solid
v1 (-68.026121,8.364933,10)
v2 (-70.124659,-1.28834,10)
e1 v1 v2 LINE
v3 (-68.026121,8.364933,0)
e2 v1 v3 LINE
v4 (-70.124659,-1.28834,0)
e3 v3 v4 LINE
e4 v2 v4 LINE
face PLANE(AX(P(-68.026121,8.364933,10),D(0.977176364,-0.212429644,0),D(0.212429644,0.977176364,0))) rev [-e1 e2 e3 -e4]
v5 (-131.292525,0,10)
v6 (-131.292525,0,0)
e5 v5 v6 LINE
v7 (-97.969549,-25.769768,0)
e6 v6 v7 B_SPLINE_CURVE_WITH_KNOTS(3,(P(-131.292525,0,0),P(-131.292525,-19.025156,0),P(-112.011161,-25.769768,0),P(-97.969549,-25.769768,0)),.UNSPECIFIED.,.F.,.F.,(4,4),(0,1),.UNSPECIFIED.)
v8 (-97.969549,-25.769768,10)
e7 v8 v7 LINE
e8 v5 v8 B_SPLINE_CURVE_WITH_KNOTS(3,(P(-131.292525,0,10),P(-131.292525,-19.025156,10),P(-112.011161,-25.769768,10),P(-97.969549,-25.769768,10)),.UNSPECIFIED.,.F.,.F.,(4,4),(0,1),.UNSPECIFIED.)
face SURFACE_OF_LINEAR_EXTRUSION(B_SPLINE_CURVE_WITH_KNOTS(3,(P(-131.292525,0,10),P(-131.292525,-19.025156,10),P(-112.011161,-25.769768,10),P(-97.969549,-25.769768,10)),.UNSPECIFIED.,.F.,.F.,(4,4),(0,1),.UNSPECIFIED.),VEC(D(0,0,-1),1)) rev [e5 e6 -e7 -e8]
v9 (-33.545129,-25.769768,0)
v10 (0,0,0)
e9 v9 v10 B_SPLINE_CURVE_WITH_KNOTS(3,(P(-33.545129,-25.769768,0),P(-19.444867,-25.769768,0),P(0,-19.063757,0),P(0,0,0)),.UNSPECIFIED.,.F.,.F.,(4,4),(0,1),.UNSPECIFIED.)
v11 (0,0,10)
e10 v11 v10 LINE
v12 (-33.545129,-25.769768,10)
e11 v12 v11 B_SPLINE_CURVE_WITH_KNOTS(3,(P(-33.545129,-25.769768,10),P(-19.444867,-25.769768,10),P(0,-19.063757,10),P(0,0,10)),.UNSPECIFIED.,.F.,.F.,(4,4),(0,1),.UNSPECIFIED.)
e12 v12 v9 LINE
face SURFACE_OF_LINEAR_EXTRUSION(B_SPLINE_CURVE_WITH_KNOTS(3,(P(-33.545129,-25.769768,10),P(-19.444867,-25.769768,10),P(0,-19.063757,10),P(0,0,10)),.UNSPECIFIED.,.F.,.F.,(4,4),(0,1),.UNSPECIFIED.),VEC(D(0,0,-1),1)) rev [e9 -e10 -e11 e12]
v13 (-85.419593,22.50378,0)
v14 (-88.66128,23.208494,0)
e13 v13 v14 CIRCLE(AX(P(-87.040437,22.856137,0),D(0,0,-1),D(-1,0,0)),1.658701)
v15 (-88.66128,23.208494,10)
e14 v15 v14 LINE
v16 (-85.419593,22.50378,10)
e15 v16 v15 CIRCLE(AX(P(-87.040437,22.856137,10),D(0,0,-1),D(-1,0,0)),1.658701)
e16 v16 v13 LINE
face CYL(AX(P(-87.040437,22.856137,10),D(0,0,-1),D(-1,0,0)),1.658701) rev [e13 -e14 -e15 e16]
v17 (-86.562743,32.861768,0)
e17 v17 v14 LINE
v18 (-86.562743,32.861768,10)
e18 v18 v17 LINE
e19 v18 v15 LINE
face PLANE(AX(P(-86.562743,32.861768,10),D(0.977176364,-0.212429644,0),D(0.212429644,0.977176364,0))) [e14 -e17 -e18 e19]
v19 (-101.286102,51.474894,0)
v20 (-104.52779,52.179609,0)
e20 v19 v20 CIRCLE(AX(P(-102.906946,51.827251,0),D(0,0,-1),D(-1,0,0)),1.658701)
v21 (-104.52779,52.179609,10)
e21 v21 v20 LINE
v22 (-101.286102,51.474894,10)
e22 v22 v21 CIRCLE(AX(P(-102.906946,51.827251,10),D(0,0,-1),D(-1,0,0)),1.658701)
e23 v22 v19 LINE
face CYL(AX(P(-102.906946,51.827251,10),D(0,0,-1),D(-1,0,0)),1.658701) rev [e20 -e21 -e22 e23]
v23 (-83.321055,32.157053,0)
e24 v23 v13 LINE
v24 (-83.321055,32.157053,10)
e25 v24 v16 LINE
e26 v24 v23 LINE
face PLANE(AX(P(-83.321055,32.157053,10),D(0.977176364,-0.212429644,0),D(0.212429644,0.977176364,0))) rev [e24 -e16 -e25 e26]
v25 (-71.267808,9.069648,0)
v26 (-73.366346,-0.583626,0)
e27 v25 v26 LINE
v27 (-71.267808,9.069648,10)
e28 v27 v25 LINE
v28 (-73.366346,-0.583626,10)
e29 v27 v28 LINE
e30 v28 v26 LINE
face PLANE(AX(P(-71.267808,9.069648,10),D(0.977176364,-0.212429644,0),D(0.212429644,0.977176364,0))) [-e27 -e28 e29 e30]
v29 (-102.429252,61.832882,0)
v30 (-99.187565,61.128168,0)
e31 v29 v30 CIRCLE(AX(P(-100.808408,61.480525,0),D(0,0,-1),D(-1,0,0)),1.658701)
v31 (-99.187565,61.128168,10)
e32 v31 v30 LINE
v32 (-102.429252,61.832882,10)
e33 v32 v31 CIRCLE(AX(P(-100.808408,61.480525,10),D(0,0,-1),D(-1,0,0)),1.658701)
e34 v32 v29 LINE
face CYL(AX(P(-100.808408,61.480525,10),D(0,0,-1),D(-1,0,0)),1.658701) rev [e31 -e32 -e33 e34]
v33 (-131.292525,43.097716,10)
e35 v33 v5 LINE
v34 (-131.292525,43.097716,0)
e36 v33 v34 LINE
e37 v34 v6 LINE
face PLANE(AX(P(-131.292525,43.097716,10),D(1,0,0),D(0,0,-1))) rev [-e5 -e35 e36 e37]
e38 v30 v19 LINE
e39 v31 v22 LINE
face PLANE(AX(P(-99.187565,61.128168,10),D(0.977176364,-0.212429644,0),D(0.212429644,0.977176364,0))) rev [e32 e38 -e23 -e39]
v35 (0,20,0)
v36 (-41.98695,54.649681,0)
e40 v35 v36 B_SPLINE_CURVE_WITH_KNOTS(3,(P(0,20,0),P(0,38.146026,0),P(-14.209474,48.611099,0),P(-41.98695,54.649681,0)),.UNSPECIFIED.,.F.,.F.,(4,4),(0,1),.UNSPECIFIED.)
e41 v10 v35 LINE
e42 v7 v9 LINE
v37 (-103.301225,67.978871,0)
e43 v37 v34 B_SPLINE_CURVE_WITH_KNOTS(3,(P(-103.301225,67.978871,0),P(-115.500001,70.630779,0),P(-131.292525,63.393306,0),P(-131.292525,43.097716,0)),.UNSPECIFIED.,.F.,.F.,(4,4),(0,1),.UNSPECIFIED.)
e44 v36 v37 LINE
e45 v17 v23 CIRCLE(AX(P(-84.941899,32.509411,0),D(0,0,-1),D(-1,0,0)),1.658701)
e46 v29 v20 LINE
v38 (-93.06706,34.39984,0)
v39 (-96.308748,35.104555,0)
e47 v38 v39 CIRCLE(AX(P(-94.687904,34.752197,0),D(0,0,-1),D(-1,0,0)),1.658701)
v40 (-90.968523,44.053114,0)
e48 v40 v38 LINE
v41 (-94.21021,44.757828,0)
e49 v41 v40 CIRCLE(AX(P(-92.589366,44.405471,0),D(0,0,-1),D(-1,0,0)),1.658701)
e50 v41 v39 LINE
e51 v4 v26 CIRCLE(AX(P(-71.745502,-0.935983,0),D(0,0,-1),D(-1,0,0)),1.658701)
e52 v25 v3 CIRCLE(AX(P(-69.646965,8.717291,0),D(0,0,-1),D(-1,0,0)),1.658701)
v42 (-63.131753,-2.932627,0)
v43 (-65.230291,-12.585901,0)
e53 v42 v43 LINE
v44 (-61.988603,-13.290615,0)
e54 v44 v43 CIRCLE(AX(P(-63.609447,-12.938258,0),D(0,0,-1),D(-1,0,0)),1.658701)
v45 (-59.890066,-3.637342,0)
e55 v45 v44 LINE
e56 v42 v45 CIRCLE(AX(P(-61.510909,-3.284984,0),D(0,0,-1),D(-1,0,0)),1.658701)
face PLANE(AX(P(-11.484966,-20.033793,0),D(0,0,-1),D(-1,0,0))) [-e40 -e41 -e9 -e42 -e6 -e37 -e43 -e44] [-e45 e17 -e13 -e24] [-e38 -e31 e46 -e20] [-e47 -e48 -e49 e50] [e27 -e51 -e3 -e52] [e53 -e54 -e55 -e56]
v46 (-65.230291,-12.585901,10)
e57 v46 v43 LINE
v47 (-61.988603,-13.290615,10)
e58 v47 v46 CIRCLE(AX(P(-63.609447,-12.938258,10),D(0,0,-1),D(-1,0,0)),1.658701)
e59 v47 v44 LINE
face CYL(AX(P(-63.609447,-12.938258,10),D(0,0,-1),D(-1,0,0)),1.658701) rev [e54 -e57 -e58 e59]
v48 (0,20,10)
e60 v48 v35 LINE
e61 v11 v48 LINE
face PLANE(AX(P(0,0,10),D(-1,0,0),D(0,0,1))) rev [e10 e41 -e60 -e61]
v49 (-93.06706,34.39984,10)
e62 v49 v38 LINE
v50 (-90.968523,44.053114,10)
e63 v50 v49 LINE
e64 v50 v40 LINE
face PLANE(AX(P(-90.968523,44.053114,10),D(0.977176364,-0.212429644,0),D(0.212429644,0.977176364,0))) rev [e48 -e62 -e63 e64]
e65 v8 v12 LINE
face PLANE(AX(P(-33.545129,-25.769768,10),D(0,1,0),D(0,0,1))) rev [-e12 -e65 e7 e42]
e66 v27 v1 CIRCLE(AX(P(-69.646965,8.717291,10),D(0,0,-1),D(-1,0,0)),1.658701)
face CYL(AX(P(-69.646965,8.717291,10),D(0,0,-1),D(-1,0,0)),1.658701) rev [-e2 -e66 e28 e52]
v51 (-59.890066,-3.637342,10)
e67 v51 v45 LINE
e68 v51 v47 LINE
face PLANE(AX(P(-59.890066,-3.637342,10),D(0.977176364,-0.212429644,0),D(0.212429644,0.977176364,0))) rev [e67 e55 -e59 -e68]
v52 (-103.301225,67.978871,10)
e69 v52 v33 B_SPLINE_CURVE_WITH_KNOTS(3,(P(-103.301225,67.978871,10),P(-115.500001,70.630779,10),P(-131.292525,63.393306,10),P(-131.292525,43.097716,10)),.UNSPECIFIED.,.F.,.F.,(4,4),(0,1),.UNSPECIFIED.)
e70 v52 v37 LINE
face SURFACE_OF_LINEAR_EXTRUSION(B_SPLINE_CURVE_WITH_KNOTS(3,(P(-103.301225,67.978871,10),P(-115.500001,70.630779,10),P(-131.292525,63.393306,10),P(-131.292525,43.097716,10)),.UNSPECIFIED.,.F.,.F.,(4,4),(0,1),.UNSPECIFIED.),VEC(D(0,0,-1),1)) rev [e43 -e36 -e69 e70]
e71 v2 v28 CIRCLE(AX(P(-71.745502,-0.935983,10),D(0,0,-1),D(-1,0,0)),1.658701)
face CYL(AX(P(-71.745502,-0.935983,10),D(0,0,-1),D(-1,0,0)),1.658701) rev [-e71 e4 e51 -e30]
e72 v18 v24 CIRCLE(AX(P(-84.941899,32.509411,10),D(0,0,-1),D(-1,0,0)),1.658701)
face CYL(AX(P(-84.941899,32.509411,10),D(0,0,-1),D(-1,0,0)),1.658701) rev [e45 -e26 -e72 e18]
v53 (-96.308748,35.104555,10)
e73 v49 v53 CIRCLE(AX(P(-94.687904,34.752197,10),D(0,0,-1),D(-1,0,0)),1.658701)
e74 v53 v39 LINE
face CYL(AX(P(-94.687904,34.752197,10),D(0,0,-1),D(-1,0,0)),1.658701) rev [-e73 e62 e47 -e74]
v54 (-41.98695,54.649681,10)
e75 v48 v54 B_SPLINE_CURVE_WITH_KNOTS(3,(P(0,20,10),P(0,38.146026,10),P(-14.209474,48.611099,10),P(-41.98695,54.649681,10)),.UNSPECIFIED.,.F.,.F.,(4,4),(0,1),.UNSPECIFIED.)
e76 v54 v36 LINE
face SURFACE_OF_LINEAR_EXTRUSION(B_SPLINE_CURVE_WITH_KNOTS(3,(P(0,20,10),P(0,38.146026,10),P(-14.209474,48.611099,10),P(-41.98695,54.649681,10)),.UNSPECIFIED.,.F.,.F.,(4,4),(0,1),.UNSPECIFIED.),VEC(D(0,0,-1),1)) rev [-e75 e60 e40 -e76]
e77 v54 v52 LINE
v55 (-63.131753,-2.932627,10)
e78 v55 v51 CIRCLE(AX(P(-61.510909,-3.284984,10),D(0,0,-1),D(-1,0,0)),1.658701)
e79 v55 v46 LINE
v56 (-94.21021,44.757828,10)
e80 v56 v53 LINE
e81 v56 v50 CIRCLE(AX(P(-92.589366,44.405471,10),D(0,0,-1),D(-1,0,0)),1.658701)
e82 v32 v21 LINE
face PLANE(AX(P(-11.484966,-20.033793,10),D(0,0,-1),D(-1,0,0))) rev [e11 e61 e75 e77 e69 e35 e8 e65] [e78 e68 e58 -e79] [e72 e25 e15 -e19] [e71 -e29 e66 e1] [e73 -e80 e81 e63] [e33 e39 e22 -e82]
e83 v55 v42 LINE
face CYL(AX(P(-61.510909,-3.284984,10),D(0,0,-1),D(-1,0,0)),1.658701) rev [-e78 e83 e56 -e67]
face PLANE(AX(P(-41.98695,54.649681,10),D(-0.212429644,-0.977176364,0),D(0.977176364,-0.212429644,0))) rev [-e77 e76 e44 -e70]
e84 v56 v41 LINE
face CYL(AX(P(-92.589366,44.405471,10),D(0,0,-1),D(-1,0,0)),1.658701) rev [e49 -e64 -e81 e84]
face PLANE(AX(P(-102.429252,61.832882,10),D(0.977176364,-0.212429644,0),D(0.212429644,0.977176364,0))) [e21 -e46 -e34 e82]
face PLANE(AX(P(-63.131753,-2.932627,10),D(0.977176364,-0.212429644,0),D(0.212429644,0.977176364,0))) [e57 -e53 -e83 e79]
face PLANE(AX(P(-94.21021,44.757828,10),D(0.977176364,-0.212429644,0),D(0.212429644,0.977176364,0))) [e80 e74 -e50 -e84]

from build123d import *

# Parameters (mm, degrees)
EXTRUDE_1_DEPTH     = 10
CUT_EXTRUDE_1_DEPTH = 149.427210809
OTHER_1_DEPTH       = 10


# Read off the part's stored shape, not the designer's step: Массив, управляемый таблицей1
with BuildPart() as part:
    # Эскиз1_fr → Бобышка-Вытянуть1 (new body)
    with BuildSketch(Plane.XY):
        with BuildLine():
            Line((0, 0), (0, 20))
            add(Edge.make_bspline(
                [(0, 20), (0, 38.146025899), (-14.209474182, 48.611098897), (-41.986949672, 54.649680525)],
                knots=[0, 0, 0, 0, 1, 1, 1, 1], degree=3))
            Line((-41.986949672, 54.649680525), (-103.301225383, 67.978870897))
            add(Edge.make_bspline(
                [(-103.301225383, 67.978870897), (-115.500001367, 70.63077872), (-131.292525164, 63.393306184), (-131.292525164, 43.097715536)],
                knots=[0, 0, 0, 0, 1, 1, 1, 1], degree=3))
            Line((-131.292525164, 43.097715536), (-131.292525164, 0))
            add(Edge.make_bspline(
                [(-97.969549234, -25.769768053), (-112.011160689, -25.769768053), (-131.292525164, -19.025155818), (-131.292525164, 0)],
                knots=[0, 0, 0, 0, 1, 1, 1, 1], degree=3))
            Line((-97.969549234, -25.769768053), (-33.545129103, -25.769768053))
            add(Edge.make_bspline(
                [(-33.545129103, -25.769768053), (-19.444866568, -25.769768053), (0, -19.063757455), (0, 0)],
                knots=[0, 0, 0, 0, 1, 1, 1, 1], degree=3))
        make_face()
    extrude(amount=EXTRUDE_1_DEPTH)

    # Эскиз2_fr → Вырез-Вытянуть1 (cut, through all)
    with BuildSketch(Plane(origin=(0, 0, 0), x_dir=(-1, 0, 0), z_dir=(0, 0, -1))):
        with BuildLine():
            Line((102.429251955, 61.832882372), (104.527789693, 52.179608775))
            ThreePointArc((104.527789693, 52.179608775), (103.259303337, 50.206407776), (101.286102339, 51.474894133))
            Line((101.286102339, 51.474894133), (99.1875646, 61.128167729))
            ThreePointArc((99.1875646, 61.128167729), (100.456050956, 63.101368728), (102.429251955, 61.832882372))
        make_face()
    extrude(amount=-CUT_EXTRUDE_1_DEPTH, mode=Mode.SUBTRACT)

    # Массив, управляемый таблицей1 outline → Массив, управляемый таблицей1 (cut)
    with BuildSketch(Plane.XY):
        with BuildLine():
            ThreePointArc((-59.89006563, -3.637341625), (-61.158551986, -1.664140626), (-63.131752985, -2.932626983))
            Line((-63.131752985, -2.932626983), (-65.230290724, -12.585900579))
            ThreePointArc((-65.230290724, -12.585900579), (-63.961804368, -14.559101578), (-61.988603369, -13.290615222))
            Line((-61.988603369, -13.290615222), (-59.89006563, -3.637341625))
        make_face()
        with BuildLine():
            ThreePointArc((-68.026121008, 8.36493328), (-69.294607365, 10.338134278), (-71.267808363, 9.069647922))
            Line((-71.267808363, 9.069647922), (-73.366346102, -0.583625675))
            ThreePointArc((-73.366346102, -0.583625675), (-72.097859745, -2.556826673), (-70.124658747, -1.288340317))
            Line((-70.124658747, -1.288340317), (-68.026121008, 8.36493328))
        make_face()
        with BuildLine():
            ThreePointArc((-83.3210554, 32.157053445), (-84.589541757, 34.130254443), (-86.562742755, 32.861768087))
            Line((-86.562742755, 32.861768087), (-88.661280493, 23.208494491))
            ThreePointArc((-88.661280493, 23.208494491), (-87.392794137, 21.235293492), (-85.419593138, 22.503779848))
            Line((-85.419593138, 22.503779848), (-83.3210554, 32.157053445))
        make_face()
        with BuildLine():
            ThreePointArc((-90.968522596, 44.053113527), (-92.237008952, 46.026314526), (-94.210209951, 44.75782817))
            Line((-94.210209951, 44.75782817), (-96.308747689, 35.104554573))
            ThreePointArc((-96.308747689, 35.104554573), (-95.040261333, 33.131353574), (-93.067060334, 34.399839931))
            Line((-93.067060334, 34.399839931), (-90.968522596, 44.053113527))
        make_face()
    extrude(amount=OTHER_1_DEPTH, mode=Mode.SUBTRACT)


solid = part.part
